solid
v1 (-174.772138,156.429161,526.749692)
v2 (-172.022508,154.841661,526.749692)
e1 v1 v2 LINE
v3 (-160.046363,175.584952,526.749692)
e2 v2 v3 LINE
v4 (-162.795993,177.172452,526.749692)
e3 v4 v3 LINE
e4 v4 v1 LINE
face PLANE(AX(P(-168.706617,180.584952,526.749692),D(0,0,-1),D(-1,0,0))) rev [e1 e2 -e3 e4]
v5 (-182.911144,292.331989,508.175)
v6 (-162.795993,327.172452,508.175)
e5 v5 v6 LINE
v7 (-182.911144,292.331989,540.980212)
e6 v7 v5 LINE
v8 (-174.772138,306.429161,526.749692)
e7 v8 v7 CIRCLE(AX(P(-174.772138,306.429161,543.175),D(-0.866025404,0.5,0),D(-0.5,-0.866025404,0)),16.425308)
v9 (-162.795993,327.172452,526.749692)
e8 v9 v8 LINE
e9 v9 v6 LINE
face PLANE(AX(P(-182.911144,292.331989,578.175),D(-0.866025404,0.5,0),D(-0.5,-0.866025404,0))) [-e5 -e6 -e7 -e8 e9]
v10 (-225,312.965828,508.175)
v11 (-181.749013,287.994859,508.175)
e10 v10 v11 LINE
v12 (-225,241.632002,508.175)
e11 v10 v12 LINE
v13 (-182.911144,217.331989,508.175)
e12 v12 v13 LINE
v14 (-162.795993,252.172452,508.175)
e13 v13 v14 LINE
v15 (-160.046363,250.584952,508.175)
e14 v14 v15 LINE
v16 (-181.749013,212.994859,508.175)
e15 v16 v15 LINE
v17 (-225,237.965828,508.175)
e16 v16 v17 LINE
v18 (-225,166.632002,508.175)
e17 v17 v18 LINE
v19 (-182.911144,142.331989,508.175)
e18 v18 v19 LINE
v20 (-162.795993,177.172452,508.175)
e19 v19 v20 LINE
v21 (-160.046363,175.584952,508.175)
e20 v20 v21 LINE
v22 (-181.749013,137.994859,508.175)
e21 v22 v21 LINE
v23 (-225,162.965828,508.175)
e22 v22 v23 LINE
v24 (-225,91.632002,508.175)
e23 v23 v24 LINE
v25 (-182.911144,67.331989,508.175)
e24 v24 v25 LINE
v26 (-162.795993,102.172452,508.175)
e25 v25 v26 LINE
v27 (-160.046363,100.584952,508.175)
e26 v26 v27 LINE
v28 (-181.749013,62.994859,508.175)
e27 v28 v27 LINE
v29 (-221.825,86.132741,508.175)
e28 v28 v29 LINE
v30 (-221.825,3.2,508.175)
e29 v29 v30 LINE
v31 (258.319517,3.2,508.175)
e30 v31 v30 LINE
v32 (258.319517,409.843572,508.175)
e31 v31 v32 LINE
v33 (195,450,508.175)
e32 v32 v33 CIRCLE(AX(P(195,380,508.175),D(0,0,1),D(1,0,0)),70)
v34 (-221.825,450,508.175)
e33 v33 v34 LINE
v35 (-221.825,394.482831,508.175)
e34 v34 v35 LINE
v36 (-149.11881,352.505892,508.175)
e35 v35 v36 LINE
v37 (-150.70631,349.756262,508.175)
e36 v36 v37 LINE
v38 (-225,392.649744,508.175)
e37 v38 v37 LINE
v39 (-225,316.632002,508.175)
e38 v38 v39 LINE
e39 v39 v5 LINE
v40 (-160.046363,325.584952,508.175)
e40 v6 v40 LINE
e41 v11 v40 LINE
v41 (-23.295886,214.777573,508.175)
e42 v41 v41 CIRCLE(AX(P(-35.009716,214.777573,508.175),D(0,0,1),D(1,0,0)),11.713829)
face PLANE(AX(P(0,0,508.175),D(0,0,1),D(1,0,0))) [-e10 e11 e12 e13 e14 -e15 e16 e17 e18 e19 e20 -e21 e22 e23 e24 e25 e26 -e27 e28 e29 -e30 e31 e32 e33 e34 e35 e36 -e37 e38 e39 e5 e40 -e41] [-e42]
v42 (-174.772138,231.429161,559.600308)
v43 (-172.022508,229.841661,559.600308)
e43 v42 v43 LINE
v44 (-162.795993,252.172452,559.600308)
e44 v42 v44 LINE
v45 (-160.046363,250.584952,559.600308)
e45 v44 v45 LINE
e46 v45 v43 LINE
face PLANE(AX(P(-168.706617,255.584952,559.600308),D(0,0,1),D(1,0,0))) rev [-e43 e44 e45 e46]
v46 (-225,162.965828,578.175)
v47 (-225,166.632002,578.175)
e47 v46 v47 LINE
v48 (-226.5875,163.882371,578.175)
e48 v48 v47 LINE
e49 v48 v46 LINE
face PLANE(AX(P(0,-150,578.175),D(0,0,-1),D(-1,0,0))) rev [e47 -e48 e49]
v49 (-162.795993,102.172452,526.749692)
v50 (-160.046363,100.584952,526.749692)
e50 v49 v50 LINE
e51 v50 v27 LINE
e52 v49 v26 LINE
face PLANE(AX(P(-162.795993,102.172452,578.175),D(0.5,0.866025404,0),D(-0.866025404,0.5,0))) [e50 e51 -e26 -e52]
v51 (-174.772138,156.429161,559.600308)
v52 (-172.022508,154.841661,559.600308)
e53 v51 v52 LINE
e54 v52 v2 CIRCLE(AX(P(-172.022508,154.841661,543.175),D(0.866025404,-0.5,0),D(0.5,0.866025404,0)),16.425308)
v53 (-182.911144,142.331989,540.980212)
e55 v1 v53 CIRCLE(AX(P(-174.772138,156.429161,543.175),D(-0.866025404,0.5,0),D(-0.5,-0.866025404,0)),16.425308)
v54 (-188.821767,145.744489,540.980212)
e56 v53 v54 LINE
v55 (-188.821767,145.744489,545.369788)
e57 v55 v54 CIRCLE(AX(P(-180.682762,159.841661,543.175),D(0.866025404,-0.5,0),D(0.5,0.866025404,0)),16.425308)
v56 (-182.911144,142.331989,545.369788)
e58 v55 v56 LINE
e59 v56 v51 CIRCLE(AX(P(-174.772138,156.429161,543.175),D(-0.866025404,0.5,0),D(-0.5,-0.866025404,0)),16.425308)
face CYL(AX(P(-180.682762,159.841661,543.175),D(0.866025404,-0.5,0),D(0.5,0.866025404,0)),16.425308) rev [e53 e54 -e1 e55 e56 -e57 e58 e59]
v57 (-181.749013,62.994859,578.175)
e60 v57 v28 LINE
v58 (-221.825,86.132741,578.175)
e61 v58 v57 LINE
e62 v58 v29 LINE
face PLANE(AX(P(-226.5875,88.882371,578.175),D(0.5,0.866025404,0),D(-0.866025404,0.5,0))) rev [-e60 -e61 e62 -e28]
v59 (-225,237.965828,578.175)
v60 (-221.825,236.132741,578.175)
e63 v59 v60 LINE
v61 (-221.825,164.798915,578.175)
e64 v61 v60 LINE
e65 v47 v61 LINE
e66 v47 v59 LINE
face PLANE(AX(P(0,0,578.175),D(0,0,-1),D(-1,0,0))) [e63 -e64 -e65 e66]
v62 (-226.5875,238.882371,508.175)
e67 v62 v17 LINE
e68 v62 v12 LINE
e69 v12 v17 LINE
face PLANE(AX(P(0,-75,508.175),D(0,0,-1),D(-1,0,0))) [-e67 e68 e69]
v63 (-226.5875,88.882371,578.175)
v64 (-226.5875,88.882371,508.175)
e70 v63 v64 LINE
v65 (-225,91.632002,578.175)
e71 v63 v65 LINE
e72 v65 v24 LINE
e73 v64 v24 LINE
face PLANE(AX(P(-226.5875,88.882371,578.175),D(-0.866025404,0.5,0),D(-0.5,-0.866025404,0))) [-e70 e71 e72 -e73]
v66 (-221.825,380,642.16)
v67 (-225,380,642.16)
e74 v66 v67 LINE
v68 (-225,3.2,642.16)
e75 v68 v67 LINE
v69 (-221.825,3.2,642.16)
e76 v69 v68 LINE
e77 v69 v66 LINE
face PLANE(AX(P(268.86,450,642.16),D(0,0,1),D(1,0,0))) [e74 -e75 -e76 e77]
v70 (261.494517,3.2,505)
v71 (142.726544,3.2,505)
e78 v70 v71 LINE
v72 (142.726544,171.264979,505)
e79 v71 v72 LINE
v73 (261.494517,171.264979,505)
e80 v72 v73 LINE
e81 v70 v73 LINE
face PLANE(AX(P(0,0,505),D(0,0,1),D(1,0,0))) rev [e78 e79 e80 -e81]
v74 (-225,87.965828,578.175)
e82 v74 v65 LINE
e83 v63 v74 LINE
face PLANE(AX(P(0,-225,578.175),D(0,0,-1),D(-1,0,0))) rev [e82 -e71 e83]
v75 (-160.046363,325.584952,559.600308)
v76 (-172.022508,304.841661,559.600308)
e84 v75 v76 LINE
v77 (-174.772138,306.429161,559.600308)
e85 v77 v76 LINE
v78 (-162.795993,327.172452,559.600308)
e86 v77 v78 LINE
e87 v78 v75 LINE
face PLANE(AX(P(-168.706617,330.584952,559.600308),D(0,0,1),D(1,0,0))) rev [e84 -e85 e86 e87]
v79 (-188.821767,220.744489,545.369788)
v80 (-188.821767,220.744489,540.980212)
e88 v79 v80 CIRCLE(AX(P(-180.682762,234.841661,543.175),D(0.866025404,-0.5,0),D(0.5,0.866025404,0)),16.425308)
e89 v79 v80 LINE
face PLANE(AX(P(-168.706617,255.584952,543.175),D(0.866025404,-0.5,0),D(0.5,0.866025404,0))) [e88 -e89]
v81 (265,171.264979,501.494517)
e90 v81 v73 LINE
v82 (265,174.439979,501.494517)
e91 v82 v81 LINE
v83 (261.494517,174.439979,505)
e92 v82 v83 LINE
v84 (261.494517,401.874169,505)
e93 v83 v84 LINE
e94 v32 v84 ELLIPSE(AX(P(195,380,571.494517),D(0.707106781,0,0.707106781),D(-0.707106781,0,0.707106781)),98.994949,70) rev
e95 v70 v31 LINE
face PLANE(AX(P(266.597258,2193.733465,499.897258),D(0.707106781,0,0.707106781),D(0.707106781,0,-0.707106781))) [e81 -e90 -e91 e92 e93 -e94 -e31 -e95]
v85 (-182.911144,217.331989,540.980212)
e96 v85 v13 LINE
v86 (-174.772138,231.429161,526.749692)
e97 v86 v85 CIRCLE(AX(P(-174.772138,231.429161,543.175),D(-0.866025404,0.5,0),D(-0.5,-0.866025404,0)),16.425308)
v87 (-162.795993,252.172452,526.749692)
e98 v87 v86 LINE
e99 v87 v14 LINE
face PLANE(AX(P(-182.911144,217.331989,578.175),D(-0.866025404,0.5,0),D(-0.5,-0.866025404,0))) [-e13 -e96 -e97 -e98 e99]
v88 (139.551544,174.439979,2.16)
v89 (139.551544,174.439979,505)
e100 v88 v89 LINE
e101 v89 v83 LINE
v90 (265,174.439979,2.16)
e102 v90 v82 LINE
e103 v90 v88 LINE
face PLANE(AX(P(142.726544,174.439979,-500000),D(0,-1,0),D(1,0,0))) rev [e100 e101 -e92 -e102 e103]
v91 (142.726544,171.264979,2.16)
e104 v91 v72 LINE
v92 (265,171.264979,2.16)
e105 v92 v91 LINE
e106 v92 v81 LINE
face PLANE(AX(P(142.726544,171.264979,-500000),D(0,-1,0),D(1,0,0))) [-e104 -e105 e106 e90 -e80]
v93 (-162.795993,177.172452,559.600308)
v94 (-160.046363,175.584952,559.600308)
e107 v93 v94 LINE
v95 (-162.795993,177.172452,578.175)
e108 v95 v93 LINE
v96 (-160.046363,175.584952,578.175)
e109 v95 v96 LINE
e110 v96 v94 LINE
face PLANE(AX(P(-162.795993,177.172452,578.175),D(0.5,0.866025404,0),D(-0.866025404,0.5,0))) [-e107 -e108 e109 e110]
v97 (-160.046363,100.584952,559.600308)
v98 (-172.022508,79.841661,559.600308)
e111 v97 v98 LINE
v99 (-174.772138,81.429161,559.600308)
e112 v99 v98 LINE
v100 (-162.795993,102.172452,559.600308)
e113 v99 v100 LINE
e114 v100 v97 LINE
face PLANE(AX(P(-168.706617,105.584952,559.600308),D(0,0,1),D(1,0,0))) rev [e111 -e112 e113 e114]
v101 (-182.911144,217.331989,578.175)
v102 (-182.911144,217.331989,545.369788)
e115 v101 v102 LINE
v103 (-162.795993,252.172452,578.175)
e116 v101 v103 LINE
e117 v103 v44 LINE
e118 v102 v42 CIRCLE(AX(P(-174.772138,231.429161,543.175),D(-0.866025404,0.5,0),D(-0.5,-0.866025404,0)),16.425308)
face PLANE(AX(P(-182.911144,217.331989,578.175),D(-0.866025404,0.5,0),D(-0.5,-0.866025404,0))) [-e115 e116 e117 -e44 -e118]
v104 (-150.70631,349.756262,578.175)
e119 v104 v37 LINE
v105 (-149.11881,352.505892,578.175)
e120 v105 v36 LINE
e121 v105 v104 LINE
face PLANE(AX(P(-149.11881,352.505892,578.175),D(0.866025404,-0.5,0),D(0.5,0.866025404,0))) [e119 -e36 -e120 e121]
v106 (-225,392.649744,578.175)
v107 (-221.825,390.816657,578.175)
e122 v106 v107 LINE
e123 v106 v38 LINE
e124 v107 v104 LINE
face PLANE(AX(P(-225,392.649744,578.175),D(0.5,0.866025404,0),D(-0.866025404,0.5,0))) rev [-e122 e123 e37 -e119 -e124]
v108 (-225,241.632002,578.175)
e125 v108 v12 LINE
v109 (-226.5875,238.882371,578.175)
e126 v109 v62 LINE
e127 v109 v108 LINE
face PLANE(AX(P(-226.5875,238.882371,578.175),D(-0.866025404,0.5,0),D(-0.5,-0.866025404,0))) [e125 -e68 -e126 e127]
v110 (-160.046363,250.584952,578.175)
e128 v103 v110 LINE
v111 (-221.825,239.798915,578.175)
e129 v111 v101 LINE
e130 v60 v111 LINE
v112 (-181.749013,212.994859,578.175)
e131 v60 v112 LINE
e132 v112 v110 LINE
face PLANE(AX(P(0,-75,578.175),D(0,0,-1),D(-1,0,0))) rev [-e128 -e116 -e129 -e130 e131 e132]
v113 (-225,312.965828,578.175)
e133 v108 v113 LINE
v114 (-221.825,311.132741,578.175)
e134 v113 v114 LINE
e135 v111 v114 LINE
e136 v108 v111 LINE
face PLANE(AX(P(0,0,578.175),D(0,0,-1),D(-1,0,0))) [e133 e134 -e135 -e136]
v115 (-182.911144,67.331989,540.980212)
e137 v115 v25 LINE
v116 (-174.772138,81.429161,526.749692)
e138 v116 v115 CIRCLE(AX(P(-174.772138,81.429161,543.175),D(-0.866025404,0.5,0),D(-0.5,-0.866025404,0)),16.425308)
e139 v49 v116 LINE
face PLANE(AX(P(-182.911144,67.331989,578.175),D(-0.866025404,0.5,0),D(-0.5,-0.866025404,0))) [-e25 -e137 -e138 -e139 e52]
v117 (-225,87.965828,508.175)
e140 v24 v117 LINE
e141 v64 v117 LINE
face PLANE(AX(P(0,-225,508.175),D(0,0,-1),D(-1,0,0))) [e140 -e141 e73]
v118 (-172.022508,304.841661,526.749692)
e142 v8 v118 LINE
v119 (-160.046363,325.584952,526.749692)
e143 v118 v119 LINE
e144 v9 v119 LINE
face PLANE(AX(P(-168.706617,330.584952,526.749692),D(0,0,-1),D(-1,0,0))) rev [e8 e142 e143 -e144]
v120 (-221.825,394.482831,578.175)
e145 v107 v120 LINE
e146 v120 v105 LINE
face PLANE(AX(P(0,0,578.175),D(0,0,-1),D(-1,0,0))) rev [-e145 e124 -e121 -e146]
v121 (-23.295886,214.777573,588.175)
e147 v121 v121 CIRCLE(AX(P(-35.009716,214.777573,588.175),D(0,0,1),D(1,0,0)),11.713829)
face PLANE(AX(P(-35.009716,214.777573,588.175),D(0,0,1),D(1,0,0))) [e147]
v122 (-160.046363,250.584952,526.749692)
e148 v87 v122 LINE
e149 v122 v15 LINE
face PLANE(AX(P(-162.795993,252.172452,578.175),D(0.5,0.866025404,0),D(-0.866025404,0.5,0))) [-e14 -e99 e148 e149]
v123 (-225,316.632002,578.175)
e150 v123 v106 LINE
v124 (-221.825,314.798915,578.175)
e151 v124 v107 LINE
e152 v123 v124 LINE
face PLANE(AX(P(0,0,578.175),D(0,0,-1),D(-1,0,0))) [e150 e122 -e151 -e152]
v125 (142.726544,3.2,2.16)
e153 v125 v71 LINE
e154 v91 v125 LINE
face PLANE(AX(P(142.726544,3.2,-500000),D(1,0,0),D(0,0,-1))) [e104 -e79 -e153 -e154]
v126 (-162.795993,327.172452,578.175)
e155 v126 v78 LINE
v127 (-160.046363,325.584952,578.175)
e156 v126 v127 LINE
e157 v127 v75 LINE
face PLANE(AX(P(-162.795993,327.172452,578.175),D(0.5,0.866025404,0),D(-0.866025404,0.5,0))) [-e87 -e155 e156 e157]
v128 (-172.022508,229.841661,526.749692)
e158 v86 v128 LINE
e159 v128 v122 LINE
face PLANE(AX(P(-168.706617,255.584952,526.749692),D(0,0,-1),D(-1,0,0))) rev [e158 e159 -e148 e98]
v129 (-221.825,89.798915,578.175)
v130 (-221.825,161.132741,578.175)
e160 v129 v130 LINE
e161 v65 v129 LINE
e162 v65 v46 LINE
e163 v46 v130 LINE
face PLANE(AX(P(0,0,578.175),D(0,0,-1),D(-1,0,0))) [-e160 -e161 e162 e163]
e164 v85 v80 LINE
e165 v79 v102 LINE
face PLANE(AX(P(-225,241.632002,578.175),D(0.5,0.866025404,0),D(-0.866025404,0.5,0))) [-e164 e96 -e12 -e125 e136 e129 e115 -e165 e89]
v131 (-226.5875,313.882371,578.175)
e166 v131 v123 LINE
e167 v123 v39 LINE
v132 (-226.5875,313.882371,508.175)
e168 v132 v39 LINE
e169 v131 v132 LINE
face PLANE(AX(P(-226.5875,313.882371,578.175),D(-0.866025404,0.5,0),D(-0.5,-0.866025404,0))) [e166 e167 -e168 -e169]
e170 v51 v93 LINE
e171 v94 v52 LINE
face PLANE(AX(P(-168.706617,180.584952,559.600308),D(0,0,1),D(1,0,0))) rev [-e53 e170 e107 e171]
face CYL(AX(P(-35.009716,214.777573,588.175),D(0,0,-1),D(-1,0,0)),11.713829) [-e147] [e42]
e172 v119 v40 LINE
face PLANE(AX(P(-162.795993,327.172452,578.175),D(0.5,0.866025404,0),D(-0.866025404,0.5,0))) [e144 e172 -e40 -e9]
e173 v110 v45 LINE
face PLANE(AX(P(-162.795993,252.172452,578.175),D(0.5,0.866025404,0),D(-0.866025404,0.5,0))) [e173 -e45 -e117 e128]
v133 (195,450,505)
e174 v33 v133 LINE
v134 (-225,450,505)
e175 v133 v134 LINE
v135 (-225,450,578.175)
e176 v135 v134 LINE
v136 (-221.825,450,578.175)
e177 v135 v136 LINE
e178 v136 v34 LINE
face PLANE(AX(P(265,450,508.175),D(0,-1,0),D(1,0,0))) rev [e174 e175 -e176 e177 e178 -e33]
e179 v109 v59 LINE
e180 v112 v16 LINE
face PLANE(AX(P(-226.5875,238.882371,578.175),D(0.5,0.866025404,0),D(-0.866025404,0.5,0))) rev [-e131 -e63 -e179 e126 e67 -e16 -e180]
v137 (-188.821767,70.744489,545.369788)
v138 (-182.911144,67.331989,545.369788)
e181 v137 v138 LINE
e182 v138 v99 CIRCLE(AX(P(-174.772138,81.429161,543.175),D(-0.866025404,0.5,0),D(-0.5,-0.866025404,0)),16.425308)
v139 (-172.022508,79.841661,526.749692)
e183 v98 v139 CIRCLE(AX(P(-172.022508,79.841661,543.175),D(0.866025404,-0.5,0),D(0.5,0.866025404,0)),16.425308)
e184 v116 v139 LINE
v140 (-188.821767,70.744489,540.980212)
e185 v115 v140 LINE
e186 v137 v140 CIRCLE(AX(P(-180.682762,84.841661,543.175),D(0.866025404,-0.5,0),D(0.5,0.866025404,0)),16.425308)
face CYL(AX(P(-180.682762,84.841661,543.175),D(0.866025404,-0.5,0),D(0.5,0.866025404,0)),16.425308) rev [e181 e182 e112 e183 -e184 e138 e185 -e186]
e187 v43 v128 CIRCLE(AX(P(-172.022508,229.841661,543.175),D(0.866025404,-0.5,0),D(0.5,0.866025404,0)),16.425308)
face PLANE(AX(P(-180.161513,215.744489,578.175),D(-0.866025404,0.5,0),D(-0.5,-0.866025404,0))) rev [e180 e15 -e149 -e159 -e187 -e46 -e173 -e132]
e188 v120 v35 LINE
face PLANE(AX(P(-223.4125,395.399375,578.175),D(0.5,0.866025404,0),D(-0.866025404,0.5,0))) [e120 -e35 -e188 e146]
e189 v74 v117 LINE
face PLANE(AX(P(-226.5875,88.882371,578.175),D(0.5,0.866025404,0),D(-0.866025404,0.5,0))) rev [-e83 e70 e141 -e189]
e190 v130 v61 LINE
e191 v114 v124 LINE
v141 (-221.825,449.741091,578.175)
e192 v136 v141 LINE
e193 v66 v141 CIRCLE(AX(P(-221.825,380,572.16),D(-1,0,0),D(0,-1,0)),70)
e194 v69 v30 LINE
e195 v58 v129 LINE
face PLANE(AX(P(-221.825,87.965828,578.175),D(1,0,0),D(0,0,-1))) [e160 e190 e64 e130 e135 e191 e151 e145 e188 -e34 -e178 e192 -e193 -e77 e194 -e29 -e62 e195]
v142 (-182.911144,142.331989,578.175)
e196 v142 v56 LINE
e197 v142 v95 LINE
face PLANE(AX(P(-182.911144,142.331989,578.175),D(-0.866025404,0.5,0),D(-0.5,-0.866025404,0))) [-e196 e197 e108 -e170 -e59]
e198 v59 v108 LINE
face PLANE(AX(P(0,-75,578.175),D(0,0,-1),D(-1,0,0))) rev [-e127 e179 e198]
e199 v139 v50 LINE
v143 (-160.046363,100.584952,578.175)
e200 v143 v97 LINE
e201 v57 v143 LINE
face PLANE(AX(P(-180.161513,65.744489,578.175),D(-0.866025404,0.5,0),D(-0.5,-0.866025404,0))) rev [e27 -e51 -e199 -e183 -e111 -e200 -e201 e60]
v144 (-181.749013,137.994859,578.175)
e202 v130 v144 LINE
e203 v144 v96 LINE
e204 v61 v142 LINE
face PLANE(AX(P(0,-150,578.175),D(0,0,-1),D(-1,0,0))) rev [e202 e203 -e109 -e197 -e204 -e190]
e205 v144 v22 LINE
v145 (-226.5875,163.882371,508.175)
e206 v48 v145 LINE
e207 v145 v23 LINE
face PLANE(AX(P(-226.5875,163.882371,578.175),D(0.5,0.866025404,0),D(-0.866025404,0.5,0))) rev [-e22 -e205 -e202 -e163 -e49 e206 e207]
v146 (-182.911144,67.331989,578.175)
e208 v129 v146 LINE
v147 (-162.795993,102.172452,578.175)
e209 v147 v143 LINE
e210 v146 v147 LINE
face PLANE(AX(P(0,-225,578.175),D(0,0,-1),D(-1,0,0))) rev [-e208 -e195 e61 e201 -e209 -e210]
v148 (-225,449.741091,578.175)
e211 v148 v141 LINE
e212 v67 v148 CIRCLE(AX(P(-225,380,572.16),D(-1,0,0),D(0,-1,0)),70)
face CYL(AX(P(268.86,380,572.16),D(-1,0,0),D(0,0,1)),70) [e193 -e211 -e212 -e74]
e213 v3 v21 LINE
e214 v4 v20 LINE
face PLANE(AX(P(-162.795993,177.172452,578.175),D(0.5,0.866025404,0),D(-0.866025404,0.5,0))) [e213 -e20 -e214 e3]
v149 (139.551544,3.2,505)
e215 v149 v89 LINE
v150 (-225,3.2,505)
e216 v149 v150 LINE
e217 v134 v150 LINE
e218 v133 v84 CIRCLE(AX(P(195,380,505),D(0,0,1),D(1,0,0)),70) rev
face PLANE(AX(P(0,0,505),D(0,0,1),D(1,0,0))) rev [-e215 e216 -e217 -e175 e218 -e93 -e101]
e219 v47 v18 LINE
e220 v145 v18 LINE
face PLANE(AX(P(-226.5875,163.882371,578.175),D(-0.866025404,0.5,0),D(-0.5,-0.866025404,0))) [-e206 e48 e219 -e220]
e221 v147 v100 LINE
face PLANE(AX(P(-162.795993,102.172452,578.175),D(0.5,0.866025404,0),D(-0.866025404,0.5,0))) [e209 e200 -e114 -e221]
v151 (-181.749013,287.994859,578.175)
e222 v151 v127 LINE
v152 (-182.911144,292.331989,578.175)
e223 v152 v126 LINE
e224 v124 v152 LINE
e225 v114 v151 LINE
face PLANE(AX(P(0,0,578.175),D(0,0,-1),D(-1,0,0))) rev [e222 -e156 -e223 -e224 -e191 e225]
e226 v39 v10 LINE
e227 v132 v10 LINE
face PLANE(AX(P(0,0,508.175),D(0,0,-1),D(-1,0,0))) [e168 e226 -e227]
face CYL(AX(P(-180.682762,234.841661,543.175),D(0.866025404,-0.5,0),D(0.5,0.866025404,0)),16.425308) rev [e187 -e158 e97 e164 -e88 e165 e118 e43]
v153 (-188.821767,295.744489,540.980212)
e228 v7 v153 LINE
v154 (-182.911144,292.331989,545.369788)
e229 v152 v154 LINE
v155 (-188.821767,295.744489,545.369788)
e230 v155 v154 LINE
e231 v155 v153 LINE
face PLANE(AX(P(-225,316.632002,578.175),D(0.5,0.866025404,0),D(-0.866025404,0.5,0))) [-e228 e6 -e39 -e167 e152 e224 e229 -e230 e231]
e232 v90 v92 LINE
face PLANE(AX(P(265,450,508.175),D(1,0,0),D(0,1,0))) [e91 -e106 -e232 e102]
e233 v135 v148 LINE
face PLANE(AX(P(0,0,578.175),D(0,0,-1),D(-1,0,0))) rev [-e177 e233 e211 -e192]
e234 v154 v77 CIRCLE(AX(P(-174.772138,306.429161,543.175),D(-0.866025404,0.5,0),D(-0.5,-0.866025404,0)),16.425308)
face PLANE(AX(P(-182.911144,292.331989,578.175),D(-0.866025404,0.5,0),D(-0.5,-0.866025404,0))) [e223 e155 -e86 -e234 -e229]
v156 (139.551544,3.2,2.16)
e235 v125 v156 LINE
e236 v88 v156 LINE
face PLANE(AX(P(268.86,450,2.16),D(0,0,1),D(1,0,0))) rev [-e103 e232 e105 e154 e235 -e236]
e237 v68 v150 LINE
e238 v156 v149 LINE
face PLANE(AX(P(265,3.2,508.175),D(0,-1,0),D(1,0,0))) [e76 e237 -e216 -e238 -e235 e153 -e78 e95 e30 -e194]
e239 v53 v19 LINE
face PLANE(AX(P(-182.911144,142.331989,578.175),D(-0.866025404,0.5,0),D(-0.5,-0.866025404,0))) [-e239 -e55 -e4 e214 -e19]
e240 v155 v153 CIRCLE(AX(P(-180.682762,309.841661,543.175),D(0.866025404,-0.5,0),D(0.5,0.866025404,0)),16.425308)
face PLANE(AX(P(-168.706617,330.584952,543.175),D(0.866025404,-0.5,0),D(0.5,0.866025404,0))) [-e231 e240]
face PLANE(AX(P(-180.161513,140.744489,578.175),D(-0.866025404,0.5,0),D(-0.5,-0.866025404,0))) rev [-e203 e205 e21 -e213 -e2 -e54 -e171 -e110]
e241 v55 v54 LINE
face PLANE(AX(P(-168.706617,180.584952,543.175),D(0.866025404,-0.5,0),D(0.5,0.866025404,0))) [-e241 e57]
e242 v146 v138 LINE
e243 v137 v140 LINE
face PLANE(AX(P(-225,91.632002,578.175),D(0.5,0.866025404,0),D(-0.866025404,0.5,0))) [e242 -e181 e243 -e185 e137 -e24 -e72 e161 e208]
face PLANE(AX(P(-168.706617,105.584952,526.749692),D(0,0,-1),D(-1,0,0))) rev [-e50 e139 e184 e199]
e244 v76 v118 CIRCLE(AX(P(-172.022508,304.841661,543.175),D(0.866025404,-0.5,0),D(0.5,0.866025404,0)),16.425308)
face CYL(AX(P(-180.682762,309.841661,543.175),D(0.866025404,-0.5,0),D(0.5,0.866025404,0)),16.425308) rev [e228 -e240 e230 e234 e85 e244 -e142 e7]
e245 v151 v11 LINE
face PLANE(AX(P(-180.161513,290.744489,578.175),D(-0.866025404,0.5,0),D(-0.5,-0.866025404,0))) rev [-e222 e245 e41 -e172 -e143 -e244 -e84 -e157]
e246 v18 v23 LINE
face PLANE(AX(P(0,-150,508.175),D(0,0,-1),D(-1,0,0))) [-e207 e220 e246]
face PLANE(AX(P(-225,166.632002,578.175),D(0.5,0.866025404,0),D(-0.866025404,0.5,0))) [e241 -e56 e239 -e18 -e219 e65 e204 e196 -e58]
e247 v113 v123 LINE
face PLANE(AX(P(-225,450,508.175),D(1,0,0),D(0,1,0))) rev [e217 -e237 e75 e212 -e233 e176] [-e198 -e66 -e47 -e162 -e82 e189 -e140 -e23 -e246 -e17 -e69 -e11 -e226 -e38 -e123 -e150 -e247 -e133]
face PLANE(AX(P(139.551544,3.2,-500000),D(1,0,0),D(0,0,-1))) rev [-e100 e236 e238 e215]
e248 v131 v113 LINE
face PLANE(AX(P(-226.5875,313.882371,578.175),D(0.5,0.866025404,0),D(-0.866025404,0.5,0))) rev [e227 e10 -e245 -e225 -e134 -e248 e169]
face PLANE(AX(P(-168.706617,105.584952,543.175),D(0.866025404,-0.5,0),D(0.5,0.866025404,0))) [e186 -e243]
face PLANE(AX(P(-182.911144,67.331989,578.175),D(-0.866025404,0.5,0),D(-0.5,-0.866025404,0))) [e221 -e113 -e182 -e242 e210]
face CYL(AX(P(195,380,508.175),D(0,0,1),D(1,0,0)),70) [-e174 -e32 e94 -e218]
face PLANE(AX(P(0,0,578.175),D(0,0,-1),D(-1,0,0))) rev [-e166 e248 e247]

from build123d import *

# Parameters (mm, degrees)
BOSS_EXTRUDE1_START   = 505
SKETCH1_W             = 490
SKETCH1_H             = 446.8
BOSS_EXTRUDE1_DEPTH   = 3.175
FILLET1_R             = 70
EXTRUDE_THIN1_DEPTH   = 70
CUT_EXTRUDE1_DEPTH    = 10
LPATTERN1_COUNT       = 4
LPATTERN1_PITCH       = 75
SKETCH4_R             = 11.713829312
BOSS_EXTRUDE2_DEPTH   = 80
EXTRUDE_THIN3_DEPTH   = 70
EXTRUDE_THIN4_START   = -225
EXTRUDE_THIN4_DEPTH   = 3.175
EXTRUDE_THIN5_DEPTH   = 502.84
SURFACECUT4_START     = 541.993470427
SURFACECUT4_OUTLINE_W = 12
SURFACECUT4_OUTLINE_H = 409
SURFACECUT4_DEPTH     = 4.723815117


# Read off the part's stored shape, not the designer's step: Extrude-Thin3, Extrude-Thin4, SurfaceCut4
with BuildPart() as part:
    # Sketch1 → Boss-Extrude1 (new body)
    with BuildSketch(Plane.XY.offset(BOSS_EXTRUDE1_START)):
        with Locations((20, 226.6)):
            Rectangle(SKETCH1_W, SKETCH1_H)
    extrude(amount=BOSS_EXTRUDE1_DEPTH)

    # Fillet1
    fillet1_edges = [part.edges().sort_by_distance(p)[0] for p in [
        (265, 450, 506.5875),
    ]]
    fillet(fillet1_edges, radius=FILLET1_R)

    # Sketch2 → Extrude-Thin1 (add)
    with BuildSketch(Plane.XY.offset(508.175)):
        Polygon((-225, 316.632001972), (-182.911143749, 292.331989485), (-162.795993223, 327.172452198), (-160.046362566, 325.584952198), (-181.749013092, 287.994858828), (-226.5875, 313.882371315), align=None)
    extrude_thin1 = extrude(amount=EXTRUDE_THIN1_DEPTH)

    # Sketch3 → Cut-Extrude1 (cut)
    with BuildSketch(Plane(origin=(-261.017191771, 150.698345932, 0), x_dir=(0, 0, -1), z_dir=(0.86602540378444, -0.49999999999999756, 0))):
        with BuildLine():
            Line((-526.749692135, 201.941658411), (-526.749692135, 177.989368438))
            ThreePointArc((-526.749692135, 177.989368438), (-543.175, 161.564060573), (-559.600307865, 177.989368438))
            Line((-559.600307865, 177.989368438), (-559.600307865, 201.941658411))
            ThreePointArc((-559.600307865, 201.941658411), (-543.175, 218.366966275), (-526.749692135, 201.941658411))
        make_face()
    cut_extrude1 = extrude(amount=-CUT_EXTRUDE1_DEPTH, mode=Mode.SUBTRACT)

    # LPattern1: Extrude-Thin1, Cut-Extrude1 ×4
    with Locations(*[(0, -i * LPATTERN1_PITCH, 0) for i in range(1, LPATTERN1_COUNT)]):
        add(extrude_thin1)
        add(cut_extrude1, mode=Mode.SUBTRACT)

    # Sketch4 → Boss-Extrude2 (add)
    with BuildSketch(Plane.XY.offset(508.175)):
        with Locations((-35.00971575, 214.777573056)):
            Circle(SKETCH4_R)
    extrude(amount=BOSS_EXTRUDE2_DEPTH)

    # Extrude-Thin3 outline → Extrude-Thin3 (add)
    with BuildSketch(Plane.XY.offset(508.175)):
        Polygon((-225, 450), (-225, 392.649743917), (-150.706309563, 349.756261744), (-149.118809563, 352.505892401), (-221.825, 394.482831022), (-221.825, 450), align=None)
        Polygon((-225, 87.965827762), (-225, 3.2), (-221.825, 3.2), (-221.825, 86.132740658), align=None)
    extrude(amount=EXTRUDE_THIN3_DEPTH)

    # Extrude-Thin4 outline → Extrude-Thin4 (add)
    with BuildSketch(Plane.YZ.offset(EXTRUDE_THIN4_START)):
        with BuildLine():
            Line((3.2, 578.175), (449.741091008, 578.175))
            ThreePointArc((449.741091008, 578.175), (427.323091613, 623.740277235), (380, 642.159999995))
            Line((380, 642.159999995), (3.2, 642.159999995))
            Line((3.2, 642.159999995), (3.2, 578.175))
        make_face()
    extrude(amount=EXTRUDE_THIN4_DEPTH)

    # Sketch8 → Extrude-Thin5 (add)
    with BuildSketch(Plane(origin=(0, 0, 505), x_dir=(-1, 0, 0), z_dir=(0, 0, -1))):
        Polygon((-142.726543885, 3.2), (-142.726543885, 171.264978509), (-265, 171.264978509), (-265, 174.439978509), (-139.551543885, 174.439978509), (-139.551543885, 3.2), align=None)
    extrude(amount=EXTRUDE_THIN5_DEPTH)

    # SurfaceCut4 outline → SurfaceCut4 (cut)
    with BuildSketch(Plane(origin=(0, 0, 0), x_dir=(0.707106781186548, 0, -0.707106781186547), z_dir=(0.707106781186547, 0, 0.707106781186548)).offset(SURFACECUT4_START)):
        with Locations((-172, 206.5)):
            Rectangle(SURFACECUT4_OUTLINE_W, SURFACECUT4_OUTLINE_H)
    extrude(amount=SURFACECUT4_DEPTH, mode=Mode.SUBTRACT)


solid = part.part
